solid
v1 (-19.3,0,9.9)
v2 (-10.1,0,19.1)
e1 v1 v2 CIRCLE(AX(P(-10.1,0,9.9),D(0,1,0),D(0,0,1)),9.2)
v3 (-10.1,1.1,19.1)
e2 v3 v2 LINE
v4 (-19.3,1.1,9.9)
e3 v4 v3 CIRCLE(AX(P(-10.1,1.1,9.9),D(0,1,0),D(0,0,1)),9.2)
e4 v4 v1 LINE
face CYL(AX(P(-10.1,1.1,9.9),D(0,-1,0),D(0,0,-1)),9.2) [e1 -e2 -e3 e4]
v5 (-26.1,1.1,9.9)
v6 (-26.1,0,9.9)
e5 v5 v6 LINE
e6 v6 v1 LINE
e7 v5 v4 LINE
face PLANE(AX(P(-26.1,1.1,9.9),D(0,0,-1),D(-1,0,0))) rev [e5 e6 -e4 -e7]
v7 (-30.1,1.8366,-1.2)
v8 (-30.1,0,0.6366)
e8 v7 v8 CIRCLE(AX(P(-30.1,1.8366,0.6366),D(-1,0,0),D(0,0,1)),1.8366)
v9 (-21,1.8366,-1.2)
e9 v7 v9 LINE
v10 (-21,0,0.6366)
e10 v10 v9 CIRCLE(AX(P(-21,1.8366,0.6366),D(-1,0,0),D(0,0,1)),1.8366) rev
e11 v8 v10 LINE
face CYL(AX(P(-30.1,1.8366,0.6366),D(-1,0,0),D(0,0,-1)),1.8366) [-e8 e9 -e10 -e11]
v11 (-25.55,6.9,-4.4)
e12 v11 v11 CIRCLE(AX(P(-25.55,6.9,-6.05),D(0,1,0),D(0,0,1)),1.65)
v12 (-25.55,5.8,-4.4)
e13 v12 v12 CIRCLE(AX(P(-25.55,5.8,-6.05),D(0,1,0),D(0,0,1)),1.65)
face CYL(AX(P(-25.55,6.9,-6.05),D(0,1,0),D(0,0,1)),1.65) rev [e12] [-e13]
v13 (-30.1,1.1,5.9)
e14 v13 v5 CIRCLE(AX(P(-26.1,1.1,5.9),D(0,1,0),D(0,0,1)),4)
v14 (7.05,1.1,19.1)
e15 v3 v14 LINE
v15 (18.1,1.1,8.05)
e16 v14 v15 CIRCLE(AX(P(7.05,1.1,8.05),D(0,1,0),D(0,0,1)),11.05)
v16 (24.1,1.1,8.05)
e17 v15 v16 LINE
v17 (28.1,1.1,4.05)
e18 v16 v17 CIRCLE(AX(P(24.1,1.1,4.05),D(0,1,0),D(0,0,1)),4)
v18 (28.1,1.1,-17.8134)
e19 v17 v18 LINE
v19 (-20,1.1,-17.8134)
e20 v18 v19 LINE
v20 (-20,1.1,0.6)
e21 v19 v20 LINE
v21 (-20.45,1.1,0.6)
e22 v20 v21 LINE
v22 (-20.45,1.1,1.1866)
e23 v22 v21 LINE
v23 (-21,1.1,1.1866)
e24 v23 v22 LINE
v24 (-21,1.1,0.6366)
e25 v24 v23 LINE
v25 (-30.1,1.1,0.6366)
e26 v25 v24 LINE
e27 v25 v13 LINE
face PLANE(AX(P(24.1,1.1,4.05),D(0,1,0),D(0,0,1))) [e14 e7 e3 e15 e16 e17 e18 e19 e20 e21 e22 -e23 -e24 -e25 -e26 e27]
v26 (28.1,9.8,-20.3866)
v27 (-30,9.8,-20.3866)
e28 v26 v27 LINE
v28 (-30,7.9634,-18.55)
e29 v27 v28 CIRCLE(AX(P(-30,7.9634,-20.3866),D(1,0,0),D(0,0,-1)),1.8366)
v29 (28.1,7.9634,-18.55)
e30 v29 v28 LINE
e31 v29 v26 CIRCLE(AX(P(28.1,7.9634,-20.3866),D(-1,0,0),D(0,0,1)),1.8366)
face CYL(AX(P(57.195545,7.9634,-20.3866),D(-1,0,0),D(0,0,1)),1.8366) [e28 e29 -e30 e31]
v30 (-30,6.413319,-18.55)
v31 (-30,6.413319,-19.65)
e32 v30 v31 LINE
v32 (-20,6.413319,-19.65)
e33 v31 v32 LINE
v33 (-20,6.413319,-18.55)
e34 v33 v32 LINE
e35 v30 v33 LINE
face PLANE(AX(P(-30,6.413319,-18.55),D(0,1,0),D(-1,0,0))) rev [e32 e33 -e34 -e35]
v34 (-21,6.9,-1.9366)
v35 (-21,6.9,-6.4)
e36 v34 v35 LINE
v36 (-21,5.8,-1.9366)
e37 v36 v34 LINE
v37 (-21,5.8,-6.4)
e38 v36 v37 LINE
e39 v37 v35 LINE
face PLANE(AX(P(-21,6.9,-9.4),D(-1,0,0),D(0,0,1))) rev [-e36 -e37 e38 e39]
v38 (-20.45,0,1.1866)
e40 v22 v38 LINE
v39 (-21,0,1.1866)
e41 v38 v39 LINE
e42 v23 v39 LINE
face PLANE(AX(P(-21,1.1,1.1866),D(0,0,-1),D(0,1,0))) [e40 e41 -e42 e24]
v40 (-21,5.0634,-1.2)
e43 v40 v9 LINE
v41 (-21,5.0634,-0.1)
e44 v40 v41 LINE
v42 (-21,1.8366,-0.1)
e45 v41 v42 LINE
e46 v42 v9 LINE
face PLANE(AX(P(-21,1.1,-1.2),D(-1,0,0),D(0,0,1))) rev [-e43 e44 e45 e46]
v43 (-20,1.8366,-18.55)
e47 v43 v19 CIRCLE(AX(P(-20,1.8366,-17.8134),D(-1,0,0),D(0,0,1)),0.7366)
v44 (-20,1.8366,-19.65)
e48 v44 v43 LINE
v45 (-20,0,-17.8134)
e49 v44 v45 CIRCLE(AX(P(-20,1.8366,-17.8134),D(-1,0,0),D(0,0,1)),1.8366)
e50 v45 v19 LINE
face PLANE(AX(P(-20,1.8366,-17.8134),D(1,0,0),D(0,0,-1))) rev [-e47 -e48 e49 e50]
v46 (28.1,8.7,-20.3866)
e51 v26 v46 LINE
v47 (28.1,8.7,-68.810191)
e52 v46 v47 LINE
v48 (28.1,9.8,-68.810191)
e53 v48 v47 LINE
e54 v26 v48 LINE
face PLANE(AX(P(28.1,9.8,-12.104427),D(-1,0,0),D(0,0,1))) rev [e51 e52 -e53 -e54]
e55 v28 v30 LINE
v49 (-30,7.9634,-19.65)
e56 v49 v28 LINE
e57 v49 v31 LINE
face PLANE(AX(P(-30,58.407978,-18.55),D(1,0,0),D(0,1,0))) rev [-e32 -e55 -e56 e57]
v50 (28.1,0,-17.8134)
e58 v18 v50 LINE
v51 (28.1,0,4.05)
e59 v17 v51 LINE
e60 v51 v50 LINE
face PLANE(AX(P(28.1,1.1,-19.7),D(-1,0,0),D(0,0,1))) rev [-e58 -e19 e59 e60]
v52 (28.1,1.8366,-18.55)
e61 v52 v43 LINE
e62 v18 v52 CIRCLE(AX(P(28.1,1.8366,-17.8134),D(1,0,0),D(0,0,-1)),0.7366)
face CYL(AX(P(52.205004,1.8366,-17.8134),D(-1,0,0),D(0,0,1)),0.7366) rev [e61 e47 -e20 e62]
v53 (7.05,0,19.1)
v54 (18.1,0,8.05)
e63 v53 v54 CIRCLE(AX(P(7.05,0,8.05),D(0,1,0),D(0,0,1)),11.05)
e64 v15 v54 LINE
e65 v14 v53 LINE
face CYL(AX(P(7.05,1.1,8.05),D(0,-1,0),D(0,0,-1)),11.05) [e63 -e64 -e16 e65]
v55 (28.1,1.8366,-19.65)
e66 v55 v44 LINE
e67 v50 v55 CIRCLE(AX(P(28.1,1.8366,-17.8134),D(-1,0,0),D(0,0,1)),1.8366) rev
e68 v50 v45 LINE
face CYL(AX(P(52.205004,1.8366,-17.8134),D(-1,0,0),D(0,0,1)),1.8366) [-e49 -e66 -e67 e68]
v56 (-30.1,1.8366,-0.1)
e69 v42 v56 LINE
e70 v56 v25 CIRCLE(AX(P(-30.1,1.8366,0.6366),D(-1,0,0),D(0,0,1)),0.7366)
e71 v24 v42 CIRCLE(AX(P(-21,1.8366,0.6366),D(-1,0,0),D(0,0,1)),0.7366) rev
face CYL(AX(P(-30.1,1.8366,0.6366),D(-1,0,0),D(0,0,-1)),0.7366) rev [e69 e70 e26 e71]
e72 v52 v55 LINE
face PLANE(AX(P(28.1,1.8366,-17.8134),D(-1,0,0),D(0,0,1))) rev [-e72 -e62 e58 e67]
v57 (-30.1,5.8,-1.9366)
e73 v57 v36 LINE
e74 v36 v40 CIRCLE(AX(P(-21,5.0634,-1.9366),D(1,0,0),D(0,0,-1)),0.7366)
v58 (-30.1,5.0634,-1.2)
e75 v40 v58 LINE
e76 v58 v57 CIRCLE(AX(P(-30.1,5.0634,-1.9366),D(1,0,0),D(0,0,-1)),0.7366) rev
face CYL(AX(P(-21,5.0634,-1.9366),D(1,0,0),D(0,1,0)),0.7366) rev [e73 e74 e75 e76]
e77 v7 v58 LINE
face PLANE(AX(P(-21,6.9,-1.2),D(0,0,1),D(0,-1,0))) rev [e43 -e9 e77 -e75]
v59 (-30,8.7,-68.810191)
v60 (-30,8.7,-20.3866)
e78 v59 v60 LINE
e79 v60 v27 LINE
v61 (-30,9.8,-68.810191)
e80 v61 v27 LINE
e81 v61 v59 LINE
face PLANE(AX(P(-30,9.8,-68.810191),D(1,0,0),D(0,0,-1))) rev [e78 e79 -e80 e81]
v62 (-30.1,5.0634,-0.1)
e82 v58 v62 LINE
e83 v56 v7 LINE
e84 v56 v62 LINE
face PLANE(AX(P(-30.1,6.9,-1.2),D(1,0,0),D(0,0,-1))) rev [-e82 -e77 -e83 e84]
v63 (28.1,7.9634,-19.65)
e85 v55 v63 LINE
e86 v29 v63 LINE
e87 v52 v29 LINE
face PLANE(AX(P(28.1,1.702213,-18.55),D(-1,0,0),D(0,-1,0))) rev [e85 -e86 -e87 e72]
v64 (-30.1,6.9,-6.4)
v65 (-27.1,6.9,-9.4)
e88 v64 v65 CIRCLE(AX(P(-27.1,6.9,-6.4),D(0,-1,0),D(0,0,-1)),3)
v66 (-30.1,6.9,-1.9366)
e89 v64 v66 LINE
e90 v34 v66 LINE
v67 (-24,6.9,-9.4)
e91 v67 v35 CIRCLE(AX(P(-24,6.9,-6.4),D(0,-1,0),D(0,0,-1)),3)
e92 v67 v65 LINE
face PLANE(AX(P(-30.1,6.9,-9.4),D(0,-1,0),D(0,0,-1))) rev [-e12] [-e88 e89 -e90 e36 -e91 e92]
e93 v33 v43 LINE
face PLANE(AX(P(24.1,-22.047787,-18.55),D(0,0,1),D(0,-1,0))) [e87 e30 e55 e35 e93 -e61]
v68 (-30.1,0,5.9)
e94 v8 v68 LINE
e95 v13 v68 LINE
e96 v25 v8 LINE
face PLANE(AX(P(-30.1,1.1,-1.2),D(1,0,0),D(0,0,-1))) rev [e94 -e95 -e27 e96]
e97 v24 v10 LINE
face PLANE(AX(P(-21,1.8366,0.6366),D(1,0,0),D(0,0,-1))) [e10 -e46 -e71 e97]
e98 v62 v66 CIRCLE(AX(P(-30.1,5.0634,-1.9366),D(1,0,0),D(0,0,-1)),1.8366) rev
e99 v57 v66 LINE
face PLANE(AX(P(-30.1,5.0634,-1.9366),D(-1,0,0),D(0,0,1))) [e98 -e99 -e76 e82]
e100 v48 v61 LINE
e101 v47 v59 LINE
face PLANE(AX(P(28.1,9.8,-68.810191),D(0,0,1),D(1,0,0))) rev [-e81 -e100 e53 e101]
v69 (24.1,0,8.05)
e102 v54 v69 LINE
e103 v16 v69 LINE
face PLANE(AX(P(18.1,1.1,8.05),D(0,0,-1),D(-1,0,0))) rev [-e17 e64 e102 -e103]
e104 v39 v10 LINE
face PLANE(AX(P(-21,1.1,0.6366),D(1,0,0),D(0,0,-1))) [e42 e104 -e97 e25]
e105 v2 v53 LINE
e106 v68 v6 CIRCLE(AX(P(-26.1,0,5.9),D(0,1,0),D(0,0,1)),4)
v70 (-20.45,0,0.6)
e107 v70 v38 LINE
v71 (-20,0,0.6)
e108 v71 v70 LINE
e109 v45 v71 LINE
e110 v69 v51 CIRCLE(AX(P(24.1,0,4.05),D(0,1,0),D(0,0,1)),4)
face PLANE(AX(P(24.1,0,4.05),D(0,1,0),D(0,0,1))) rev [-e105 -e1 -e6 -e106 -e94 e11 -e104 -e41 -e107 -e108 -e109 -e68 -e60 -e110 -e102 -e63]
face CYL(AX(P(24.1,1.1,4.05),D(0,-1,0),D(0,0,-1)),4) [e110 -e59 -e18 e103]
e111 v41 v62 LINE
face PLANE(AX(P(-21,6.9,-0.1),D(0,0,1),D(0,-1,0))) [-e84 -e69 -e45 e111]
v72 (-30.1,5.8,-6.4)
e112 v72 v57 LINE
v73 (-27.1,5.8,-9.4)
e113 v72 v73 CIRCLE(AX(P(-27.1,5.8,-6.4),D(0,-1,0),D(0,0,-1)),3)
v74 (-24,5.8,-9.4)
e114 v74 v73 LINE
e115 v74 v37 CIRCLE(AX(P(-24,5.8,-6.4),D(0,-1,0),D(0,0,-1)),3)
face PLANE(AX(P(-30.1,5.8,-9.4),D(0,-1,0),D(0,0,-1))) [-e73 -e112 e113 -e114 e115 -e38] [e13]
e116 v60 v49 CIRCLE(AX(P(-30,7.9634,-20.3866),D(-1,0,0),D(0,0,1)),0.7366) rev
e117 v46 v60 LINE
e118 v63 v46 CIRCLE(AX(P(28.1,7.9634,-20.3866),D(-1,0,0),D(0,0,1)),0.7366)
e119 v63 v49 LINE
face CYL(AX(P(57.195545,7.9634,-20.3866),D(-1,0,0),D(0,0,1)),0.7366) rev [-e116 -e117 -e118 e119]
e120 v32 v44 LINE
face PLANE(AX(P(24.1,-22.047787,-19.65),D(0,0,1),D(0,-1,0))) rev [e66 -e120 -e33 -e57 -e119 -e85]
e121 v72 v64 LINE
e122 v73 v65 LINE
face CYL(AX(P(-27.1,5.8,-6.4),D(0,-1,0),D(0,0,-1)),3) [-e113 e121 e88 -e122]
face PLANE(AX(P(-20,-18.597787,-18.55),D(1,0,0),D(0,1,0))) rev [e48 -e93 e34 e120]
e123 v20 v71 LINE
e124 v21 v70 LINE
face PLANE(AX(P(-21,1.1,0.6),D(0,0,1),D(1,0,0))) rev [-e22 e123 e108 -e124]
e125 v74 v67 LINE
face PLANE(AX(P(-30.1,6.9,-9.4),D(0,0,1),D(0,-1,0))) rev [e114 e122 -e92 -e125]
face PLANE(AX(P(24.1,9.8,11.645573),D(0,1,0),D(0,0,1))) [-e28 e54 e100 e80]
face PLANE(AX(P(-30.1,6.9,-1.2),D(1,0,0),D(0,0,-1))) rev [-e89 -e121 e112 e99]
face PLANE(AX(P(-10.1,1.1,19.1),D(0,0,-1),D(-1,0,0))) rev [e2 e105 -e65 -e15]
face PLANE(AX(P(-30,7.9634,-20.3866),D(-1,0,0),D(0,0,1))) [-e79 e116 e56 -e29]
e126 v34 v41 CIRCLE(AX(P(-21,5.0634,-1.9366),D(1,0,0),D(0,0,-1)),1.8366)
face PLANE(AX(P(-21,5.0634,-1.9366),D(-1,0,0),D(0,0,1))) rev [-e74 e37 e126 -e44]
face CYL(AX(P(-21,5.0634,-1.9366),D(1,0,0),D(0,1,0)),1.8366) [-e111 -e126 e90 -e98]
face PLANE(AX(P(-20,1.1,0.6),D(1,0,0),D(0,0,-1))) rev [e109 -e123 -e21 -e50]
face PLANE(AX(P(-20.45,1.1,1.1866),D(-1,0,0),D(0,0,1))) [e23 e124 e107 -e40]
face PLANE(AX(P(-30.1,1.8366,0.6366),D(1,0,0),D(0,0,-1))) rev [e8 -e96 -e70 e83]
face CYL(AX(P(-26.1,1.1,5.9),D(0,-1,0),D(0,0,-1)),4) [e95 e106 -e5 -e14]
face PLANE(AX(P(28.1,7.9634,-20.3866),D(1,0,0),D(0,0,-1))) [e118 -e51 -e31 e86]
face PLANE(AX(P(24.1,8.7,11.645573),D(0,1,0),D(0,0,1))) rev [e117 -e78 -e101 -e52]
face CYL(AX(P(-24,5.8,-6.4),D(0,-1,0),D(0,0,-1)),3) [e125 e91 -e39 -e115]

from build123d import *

# Parameters (mm, degrees)
BASE_FLANGE1_DEPTH            = 1.1
EDGE_FLANGE1_STRIP_W          = 5.8732
EDGE_FLANGE1_STRIP_H          = 1.1
EDGE_FLANGE1_STRIP_CUT_DEPTH  = 9.1
EDGE_FLANGE1_RELIEF_W         = 6.4232
EDGE_FLANGE1_RELIEF_H         = 0.55
EDGE_FLANGE1_RELIEF_CUT_DEPTH = 1.1
EDGE_FLANGE1_DEPTH            = 9.1
EDGE_FLANGE2_STRIP_W          = 5.8732
EDGE_FLANGE2_STRIP_H          = 1.1
EDGE_FLANGE2_STRIP_CUT_DEPTH  = 9.1
EDGE_FLANGE2_DEPTH            = 9.1
SKETCH9_R                     = 1.65
EXTRUDE1_DEPTH                = 1.1
SKETCHED_START                = -30
SKETCHED_BEND2_DEPTH          = 58.1
SKETCHED_BEND2_2_OUTLINE_W    = 51.994658845
SKETCHED_BEND2_2_OUTLINE_H    = 1.1
SKETCHED_BEND2_2_DEPTH        = 58.1
SKETCHED_START_2              = -20
SKETCHED_BEND2_3_DEPTH        = 48.1
SKETCHED_BEND6_DEPTH          = 58.1
SKETCHED_BEND6_2_DEPTH        = 58.1


# Read off the part's stored shape, not the designer's step: Sketched Bend2, Sketched Bend6
# Sheet-metal steps are written as plain solids
with BuildPart() as part:
    # Sketch1 → Base-Flange1 (new body)
    with BuildSketch(Plane(origin=(0, 0, 0), x_dir=(1, 0, 0), z_dir=(0, 1, 0))):
        with BuildLine():
            Line((-30.1, 1.2), (-21, 1.2))
            Line((-21, 1.2), (-21, -0.6))
            Line((-21, -0.6), (-20, -0.6))
            Line((-20, -0.6), (-20, 24.411105723))
            Line((-20, 24.411105723), (-30, 24.411105723))
            Line((-30, 24.411105723), (-30, 76.405764568))
            Line((-30, 76.405764568), (28.1, 76.405764568))
            Line((28.1, 76.405764568), (28.1, 19.7))
            Line((28.1, 19.7), (28.1, -4.05))
            ThreePointArc((28.1, -4.05), (26.928427125, -6.878427125), (24.1, -8.05))
            Line((24.1, -8.05), (18.1, -8.05))
            ThreePointArc((18.1, -8.05), (14.863529932, -15.863529932), (7.05, -19.1))
            Line((7.05, -19.1), (-10.1, -19.1))
            ThreePointArc((-10.1, -19.1), (-16.605382387, -16.405382387), (-19.3, -9.9))
            Line((-19.3, -9.9), (-26.1, -9.9))
            ThreePointArc((-26.1, -9.9), (-28.928427125, -8.728427125), (-30.1, -5.9))
            Line((-30.1, -5.9), (-30.1, 1.2))
        make_face()
    extrude(amount=BASE_FLANGE1_DEPTH)

    # Edge-Flange1 strip (across the edge) → Edge-Flange1 strip cut (cut)
    with BuildSketch(Plane(origin=(-21, 1.1, -1.2), x_dir=(0, 0, 1), z_dir=(-1, 0, 0))):
        with Locations((-1.1, -0.55)):
            Rectangle(EDGE_FLANGE1_STRIP_W, EDGE_FLANGE1_STRIP_H)
    extrude(amount=EDGE_FLANGE1_STRIP_CUT_DEPTH, mode=Mode.SUBTRACT)

    # Edge-Flange1 relief (on the sheet) → Edge-Flange1 relief cut (cut)
    with BuildSketch(Plane(origin=(-21, 1.1, 0.6366), x_dir=(0, 0, 1), z_dir=(0, 1, 0))):
        with Locations((-2.6616, 0.275)):
            Rectangle(EDGE_FLANGE1_RELIEF_W, EDGE_FLANGE1_RELIEF_H)
    extrude(amount=-EDGE_FLANGE1_RELIEF_CUT_DEPTH, mode=Mode.SUBTRACT)

    # Edge-Flange1 section (across the edge) → Edge-Flange1 (add)
    with BuildSketch(Plane(origin=(-21, 1.1, -1.2), x_dir=(0, 0, 1), z_dir=(-1, 0, 0))):
        with BuildLine():
            Line((0, 0.7366), (0, 5.8))
            Line((0, 5.8), (1.1, 5.8))
            Line((1.1, 5.8), (1.1, 0.7366))
            ThreePointArc((1.1, 0.7366), (1.315745145, 0.215745145), (1.8366, 0))
            Line((1.8366, 0), (1.8366, -1.1))
            ThreePointArc((1.8366, -1.1), (0.537927686, -0.562072314), (0, 0.7366))
        make_face()
    extrude(amount=EDGE_FLANGE1_DEPTH)

    # Edge-Flange2 strip (across the edge) → Edge-Flange2 strip cut (cut)
    with BuildSketch(Plane(origin=(-30.1, 6.9, -1.2), x_dir=(0, -1, 0), z_dir=(1, 0, 0))):
        with Locations((-1.1, -0.55)):
            Rectangle(EDGE_FLANGE2_STRIP_W, EDGE_FLANGE2_STRIP_H)
    extrude(amount=EDGE_FLANGE2_STRIP_CUT_DEPTH, mode=Mode.SUBTRACT)

    # Edge-Flange2 section (across the edge) → Edge-Flange2 (add)
    with BuildSketch(Plane(origin=(-30.1, 6.9, -1.2), x_dir=(0, -1, 0), z_dir=(1, 0, 0))):
        with BuildLine():
            Line((0, 0.7366), (0, 8.2))
            Line((0, 8.2), (1.1, 8.2))
            Line((1.1, 8.2), (1.1, 0.7366))
            ThreePointArc((1.1, 0.7366), (1.315745145, 0.215745145), (1.8366, 0))
            Line((1.8366, 0), (1.8366, -1.1))
            ThreePointArc((1.8366, -1.1), (0.537927686, -0.562072314), (0, 0.7366))
        make_face()
    extrude(amount=EDGE_FLANGE2_DEPTH)

    # Sketch9 → Extrude1 (cut)
    with BuildSketch(Plane(origin=(0, 6.9, 0), x_dir=(1, 0, 0), z_dir=(0, 1, 0))):
        with Locations(Location((-25.55, 6.05, 0), (0, 0, 270))):
            Circle(SKETCH9_R)
        with BuildLine():
            Line((-30.1, 6.4), (-30.1, 9.4))
            Line((-30.1, 9.4), (-27.1, 9.4))
            ThreePointArc((-27.1, 9.4), (-29.221320344, 8.521320344), (-30.1, 6.4))
        make_face()
        with BuildLine():
            Line((-24, 9.4), (-21, 9.4))
            Line((-21, 9.4), (-21, 6.4))
            ThreePointArc((-21, 6.4), (-21.878679656, 8.521320344), (-24, 9.4))
        make_face()
    extrude(amount=-EXTRUDE1_DEPTH, mode=Mode.SUBTRACT)

    # Sketched Bend2 outline → Sketched Bend2 (cut)
    with BuildSketch(Plane.YZ.offset(SKETCHED_START)):
        with BuildLine():
            ThreePointArc((1.1, -19.495814944), (0.299404636, -18.818452246), (-1.2e-08, -17.8134))
            Line((-1.2e-08, -17.8134), (0, -76.405764568))
            Line((0, -76.405764568), (1.1, -76.405764568))
            Line((1.1, -76.405764568), (1.1, -19.495814944))
        make_face()
    extrude(amount=SKETCHED_BEND2_DEPTH, mode=Mode.SUBTRACT)



with BuildPart() as body_2:
    # Sketched Bend2 2 outline → Sketched Bend2 2 (new body)
    with BuildSketch(Plane.YZ.offset(SKETCHED_START)):
        with Locations((32.410648591, -19.1)):
            Rectangle(SKETCHED_BEND2_2_OUTLINE_W, SKETCHED_BEND2_2_OUTLINE_H)
    extrude(amount=SKETCHED_BEND2_2_DEPTH)


with BuildPart() as part_1:
    add(part.part)

    add(body_2.part)  # Sketched Bend2 3 merges body 2
    # Sketched Bend2 3 outline → Sketched Bend2 3 (add)
    with BuildSketch(Plane.YZ.offset(SKETCHED_START_2)):
        with BuildLine():
            Line((6.413319169, -18.55), (1.836600012, -18.550000012))
            ThreePointArc((1.836600012, -18.550000012), (1.315745141, -18.334254868), (1.099999988, -17.8134))
            Line((1.099999988, -17.8134), (1.1, -19.495814944))
            ThreePointArc((1.1, -19.495814944), (1.460317993, -19.611040525), (1.8366, -19.650000012))
            Line((1.8366, -19.650000012), (6.413319169, -19.65))
            Line((6.413319169, -19.65), (6.413319169, -18.55))
        make_face()
    extrude(amount=SKETCHED_BEND2_3_DEPTH)

    # Sketched Bend6 outline → Sketched Bend6 (cut)
    with BuildSketch(Plane.YZ.offset(SKETCHED_START)):
        with BuildLine():
            Line((58.407978014, -18.55), (7.9634, -18.549999994))
            ThreePointArc((7.9634, -18.549999994), (8.968452241, -18.849404641), (9.645814937, -19.65))
            Line((9.645814937, -19.65), (58.407978014, -19.65))
            Line((58.407978014, -19.65), (58.407978014, -18.55))
        make_face()
    extrude(amount=SKETCHED_BEND6_DEPTH, mode=Mode.SUBTRACT)

    # Sketched Bend6 2 outline → Sketched Bend6 2 (add)
    with BuildSketch(Plane.YZ.offset(SKETCHED_START)):
        with BuildLine():
            ThreePointArc((9.800000006, -20.3866), (9.761040518, -20.010317993), (9.645814937, -19.65))
            Line((9.645814937, -19.65), (7.9634, -19.649999994))
            ThreePointArc((7.9634, -19.649999994), (8.484254859, -19.865745141), (8.700000006, -20.3866))
            Line((8.700000006, -20.3866), (8.7, -68.81019146))
            Line((8.7, -68.81019146), (9.8, -68.81019146))
            Line((9.8, -68.81019146), (9.800000006, -20.3866))
        make_face()
    extrude(amount=SKETCHED_BEND6_2_DEPTH)


solid = part_1.part
